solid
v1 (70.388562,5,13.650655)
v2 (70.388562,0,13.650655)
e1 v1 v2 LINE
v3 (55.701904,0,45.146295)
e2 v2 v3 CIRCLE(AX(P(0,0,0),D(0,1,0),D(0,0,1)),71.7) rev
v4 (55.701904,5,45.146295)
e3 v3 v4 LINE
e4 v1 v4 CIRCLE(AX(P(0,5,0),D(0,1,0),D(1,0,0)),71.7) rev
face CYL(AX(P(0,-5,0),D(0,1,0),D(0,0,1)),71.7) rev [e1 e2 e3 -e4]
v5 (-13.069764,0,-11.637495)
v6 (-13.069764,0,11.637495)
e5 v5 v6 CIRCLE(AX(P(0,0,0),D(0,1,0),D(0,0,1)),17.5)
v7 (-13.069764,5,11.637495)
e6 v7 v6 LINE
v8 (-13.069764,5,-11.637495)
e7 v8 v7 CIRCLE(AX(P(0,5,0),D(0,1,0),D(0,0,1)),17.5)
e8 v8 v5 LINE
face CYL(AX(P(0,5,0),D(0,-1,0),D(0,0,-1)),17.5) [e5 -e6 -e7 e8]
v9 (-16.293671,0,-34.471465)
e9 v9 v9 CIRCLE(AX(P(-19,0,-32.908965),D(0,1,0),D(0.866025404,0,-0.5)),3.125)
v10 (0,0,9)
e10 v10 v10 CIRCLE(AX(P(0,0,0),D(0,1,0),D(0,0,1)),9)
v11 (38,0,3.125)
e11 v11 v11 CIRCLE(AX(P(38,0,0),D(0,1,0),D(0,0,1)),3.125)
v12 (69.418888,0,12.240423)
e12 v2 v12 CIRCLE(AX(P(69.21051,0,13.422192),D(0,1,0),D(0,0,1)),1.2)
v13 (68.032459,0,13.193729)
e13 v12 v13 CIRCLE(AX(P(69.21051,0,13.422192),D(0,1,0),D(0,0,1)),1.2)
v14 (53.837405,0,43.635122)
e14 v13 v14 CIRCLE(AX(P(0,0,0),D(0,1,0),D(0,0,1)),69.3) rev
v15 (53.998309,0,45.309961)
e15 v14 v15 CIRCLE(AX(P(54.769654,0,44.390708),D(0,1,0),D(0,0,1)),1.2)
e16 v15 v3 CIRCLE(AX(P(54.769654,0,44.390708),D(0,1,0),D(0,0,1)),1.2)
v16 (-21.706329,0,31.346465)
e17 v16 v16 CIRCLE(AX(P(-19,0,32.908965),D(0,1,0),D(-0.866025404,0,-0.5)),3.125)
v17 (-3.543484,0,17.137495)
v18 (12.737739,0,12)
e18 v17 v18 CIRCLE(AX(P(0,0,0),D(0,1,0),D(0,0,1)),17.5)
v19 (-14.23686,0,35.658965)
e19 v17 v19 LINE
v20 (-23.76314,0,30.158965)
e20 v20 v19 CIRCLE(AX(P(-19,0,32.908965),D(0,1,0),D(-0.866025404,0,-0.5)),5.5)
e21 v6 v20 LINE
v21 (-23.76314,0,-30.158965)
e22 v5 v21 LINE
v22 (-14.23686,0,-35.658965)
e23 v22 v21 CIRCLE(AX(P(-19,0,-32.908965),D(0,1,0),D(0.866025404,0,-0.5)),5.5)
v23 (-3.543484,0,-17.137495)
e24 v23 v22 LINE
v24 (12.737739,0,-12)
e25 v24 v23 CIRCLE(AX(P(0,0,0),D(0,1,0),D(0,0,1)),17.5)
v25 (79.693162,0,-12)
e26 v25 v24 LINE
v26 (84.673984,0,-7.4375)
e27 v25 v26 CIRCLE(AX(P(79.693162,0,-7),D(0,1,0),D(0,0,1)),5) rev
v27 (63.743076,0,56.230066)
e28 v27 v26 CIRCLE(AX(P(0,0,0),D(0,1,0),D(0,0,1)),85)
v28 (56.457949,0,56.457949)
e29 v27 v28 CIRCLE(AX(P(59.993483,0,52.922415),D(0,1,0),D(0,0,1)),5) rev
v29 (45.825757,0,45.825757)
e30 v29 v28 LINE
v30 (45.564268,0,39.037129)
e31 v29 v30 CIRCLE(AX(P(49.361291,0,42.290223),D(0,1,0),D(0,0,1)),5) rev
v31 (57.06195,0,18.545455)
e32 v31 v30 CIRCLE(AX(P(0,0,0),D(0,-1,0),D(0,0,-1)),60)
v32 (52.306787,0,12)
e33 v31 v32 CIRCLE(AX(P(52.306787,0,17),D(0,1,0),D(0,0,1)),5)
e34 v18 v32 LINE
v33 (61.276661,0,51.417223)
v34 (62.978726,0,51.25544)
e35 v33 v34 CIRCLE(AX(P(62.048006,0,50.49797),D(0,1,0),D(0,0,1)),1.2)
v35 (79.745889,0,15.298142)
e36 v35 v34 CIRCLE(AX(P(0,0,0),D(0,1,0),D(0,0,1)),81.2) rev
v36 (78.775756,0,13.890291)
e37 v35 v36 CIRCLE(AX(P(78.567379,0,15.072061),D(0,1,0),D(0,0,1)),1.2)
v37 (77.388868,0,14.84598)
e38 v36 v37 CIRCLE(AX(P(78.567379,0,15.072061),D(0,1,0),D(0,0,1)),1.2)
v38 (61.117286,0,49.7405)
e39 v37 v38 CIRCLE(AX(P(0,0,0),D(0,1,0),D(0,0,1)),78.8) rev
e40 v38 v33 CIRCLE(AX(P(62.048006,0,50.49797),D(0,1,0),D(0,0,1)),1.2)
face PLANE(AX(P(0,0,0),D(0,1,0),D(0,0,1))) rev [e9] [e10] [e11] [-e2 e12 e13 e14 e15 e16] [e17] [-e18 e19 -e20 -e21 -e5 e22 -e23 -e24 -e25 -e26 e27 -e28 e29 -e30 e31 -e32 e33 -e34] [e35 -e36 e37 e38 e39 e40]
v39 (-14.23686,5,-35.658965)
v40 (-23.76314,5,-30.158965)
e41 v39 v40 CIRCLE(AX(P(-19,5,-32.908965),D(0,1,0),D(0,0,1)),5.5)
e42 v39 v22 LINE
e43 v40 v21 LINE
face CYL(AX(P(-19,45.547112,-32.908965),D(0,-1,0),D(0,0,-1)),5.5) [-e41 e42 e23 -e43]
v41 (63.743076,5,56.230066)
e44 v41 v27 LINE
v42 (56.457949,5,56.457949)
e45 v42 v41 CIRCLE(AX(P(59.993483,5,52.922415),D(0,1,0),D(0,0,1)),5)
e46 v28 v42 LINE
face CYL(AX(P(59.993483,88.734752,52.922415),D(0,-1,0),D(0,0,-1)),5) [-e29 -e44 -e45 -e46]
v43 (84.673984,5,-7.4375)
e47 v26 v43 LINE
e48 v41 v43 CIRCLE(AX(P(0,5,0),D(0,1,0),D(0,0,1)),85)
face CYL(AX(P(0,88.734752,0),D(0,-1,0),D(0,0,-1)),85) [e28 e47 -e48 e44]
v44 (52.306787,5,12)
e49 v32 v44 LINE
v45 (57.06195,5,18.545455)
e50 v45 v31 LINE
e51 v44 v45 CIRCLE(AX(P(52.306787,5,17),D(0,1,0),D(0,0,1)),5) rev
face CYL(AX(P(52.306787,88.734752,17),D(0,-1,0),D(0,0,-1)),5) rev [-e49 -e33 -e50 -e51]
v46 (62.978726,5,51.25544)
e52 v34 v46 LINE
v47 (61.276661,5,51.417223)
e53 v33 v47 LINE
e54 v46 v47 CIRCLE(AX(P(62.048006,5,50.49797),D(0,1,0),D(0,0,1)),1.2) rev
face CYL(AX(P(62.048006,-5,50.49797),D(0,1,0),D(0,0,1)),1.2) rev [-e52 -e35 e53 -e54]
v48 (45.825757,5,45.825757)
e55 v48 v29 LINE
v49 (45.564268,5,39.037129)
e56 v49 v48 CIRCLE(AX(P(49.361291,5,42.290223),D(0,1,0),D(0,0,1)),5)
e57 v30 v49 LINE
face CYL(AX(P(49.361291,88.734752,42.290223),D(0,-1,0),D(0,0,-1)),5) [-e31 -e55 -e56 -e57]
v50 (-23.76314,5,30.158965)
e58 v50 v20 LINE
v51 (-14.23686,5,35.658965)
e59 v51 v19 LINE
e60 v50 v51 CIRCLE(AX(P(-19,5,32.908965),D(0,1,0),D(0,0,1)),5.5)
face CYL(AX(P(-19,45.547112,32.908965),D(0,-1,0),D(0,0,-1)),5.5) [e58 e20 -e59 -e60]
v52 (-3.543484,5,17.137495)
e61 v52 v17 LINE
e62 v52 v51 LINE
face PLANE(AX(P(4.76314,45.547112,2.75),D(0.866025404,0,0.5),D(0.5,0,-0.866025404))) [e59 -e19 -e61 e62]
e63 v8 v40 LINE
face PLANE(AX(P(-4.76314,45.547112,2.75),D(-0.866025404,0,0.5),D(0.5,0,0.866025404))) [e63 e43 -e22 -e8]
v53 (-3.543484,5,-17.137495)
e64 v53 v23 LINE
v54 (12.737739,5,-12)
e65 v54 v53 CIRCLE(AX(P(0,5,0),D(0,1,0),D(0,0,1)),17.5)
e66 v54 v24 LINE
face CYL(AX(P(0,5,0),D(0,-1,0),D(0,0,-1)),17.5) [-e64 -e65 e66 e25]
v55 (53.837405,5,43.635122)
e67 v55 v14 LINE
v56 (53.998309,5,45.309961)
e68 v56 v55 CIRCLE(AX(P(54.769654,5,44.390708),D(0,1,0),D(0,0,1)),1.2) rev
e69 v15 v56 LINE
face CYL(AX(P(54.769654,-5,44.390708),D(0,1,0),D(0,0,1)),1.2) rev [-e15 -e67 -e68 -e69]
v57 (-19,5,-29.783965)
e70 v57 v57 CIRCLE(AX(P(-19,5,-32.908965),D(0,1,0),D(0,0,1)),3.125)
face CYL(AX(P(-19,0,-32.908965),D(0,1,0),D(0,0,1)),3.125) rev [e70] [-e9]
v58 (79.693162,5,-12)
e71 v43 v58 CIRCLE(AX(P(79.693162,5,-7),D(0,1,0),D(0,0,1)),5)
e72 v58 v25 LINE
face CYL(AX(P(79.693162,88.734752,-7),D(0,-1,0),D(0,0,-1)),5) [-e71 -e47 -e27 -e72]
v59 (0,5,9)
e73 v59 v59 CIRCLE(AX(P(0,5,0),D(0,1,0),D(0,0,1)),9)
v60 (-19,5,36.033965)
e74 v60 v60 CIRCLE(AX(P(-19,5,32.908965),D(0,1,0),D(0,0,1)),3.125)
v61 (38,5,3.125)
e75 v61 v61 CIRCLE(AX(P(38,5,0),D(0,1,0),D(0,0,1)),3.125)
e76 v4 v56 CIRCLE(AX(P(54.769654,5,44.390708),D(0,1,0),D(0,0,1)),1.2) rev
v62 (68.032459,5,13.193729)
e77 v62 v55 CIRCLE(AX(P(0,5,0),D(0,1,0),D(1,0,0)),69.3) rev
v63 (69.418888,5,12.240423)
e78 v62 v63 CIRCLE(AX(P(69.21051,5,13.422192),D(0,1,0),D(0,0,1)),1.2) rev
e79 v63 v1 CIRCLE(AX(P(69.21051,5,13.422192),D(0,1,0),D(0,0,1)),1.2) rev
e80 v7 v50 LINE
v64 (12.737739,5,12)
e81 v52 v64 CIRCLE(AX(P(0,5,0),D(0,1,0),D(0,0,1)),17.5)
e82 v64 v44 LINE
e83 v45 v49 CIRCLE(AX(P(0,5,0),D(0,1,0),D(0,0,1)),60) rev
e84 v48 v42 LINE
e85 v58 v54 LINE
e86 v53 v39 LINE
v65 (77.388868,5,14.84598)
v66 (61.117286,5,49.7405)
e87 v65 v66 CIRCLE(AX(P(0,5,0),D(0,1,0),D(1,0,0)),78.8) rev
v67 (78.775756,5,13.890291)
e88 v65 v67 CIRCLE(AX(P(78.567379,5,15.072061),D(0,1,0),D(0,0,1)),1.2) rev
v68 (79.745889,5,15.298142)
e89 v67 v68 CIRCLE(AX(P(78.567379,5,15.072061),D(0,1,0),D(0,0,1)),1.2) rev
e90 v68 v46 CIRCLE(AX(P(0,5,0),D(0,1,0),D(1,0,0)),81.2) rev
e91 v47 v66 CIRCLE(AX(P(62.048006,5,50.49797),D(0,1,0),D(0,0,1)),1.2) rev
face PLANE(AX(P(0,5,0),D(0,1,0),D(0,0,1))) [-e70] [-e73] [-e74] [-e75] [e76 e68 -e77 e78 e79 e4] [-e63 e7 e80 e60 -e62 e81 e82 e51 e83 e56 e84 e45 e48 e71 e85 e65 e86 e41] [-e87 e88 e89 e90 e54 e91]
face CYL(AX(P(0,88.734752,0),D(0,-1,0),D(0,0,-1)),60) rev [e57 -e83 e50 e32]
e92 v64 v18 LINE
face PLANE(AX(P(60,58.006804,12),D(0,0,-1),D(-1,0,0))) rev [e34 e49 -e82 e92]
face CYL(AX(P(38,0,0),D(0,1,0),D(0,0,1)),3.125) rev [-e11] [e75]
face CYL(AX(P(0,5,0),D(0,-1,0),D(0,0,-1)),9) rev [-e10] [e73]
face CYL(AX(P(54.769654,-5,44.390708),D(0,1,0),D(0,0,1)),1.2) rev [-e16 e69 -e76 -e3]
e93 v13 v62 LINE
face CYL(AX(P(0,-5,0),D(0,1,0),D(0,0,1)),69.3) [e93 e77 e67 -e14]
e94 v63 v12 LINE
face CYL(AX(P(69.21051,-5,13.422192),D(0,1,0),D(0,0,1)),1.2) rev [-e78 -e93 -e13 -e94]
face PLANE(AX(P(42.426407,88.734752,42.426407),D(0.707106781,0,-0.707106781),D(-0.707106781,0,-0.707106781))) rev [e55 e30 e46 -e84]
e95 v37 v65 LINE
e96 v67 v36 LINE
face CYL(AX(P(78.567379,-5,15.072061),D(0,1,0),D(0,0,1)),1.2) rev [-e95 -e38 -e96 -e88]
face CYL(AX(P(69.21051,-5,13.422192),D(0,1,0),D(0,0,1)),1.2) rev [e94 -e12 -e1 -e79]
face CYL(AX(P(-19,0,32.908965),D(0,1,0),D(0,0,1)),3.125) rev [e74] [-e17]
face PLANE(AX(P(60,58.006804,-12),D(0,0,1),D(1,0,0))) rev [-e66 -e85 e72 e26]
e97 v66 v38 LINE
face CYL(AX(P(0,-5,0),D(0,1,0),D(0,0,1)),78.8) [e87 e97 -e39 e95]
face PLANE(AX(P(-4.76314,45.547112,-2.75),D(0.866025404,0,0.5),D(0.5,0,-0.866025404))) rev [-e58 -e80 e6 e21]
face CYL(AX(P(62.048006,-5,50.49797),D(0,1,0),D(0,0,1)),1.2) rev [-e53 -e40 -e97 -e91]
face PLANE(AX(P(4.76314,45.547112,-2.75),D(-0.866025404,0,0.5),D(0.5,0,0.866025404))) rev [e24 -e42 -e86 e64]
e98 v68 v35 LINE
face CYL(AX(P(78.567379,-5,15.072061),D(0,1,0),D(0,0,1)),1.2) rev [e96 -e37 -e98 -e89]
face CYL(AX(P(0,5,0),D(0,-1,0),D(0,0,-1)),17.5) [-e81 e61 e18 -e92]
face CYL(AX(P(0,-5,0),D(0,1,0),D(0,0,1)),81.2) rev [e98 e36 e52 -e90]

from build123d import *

# Parameters (mm, degrees)
SKETCH1_R               = 17.5
SKETCH1_R_2             = 9
BOSS_EXTRUDE1_DEPTH     = 5
BOSS_EXTRUDE3_DEPTH     = 5
SKETCH6_W               = 47.262260797
SKETCH6_H               = 24
BOSS_EXTRUDE4_DEPTH     = 5
SKETCH4_R               = 3.125
CUT_EXTRUDE1_DEPTH      = 63.69968102
CIRPATTERN1_COUNT       = 3
BOSS_EXTRUDE5_DEPTH     = 5
CUT_EXTRUDE_THIN1_DEPTH = 10
FILLET1_R               = 1.2
FILLET2_R               = 5


with BuildPart() as part:
    # Sketch1 → Boss-Extrude1 (new body)
    with BuildSketch(Plane(origin=(0, 0, 0), x_dir=(1, 0, 0), z_dir=(0, 1, 0))):
        with Locations(Location((0, 0, 0), (0, 0, 270))):
            Circle(SKETCH1_R)
        with Locations(Location((0, 0, 0), (0, 0, 270))):
            Circle(SKETCH1_R_2, mode=Mode.SUBTRACT)
    extrude(amount=BOSS_EXTRUDE1_DEPTH)

    # Sketch3 → Boss-Extrude3 (add)
    with BuildSketch(Plane(origin=(0, 0, 0), x_dir=(1, 0, 0), z_dir=(0, 1, 0))):
        with BuildLine():
            Line((38, 5.5), (10.009906254, 5.5))
            Line((10.009906254, 5.5), (10.009906254, -5.5))
            Line((10.009906254, -5.5), (38, -5.5))
            ThreePointArc((38, -5.5), (32.5, 0), (38, 5.5))
        make_face()
        with BuildLine():
            ThreePointArc((43.5, 0), (41.889087297, 3.889087297), (38, 5.5))
            Line((38, 5.5), (38, -5.5))
            ThreePointArc((38, -5.5), (41.889087297, -3.889087297), (43.5, 0))
        make_face()
        with BuildLine():
            Line((38, -5.5), (38, 5.5))
            ThreePointArc((38, 5.5), (32.5, 0), (38, -5.5))
        make_face()
    boss_extrude3 = extrude(amount=BOSS_EXTRUDE3_DEPTH)

    # Sketch6 → Boss-Extrude4 (add)
    with BuildSketch(Plane(origin=(0, 0, 0), x_dir=(1, 0, 0), z_dir=(0, 1, 0))):
        with Locations((36.368869602, 0)):
            Rectangle(SKETCH6_W, SKETCH6_H)
    extrude(amount=BOSS_EXTRUDE4_DEPTH)

    # Sketch4 → Cut-Extrude1 (cut, symmetric)
    with BuildSketch(Plane(origin=(0, 5, 0), x_dir=(1, 0, 0), z_dir=(0, 1, 0))):
        with Locations(Location((38, 0, 0), (0, 0, 270))):
            Circle(SKETCH4_R)
    cut_extrude1 = extrude(amount=CUT_EXTRUDE1_DEPTH, both=True, mode=Mode.SUBTRACT)

    # CirPattern1: Boss-Extrude3, Cut-Extrude1 ×3 about axis
    cirpattern1_axis = Axis((0, 0, 0), (0, 1, 0))
    add([boss_extrude3.rotate(cirpattern1_axis, i * 360 / CIRPATTERN1_COUNT) for i in range(1, CIRPATTERN1_COUNT)])
    add([cut_extrude1.rotate(cirpattern1_axis, i * 360 / CIRPATTERN1_COUNT) for i in range(1, CIRPATTERN1_COUNT)], mode=Mode.SUBTRACT)

    # Sketch7 → Boss-Extrude5 (add)
    with BuildSketch(Plane(origin=(0, 0, 0), x_dir=(1, 0, 0), z_dir=(0, 1, 0))):
        with BuildLine():
            Line((42.426406871, -42.426406871), (60.104076401, -60.104076401))
            ThreePointArc((60.104076401, -60.104076401), (78.529760263, -32.528091751), (85, 0))
            ThreePointArc((85, 0), (84.786902365, 6.015079992), (84.148677946, 12))
            Line((84.148677946, 12), (58.787753827, 12))
            ThreePointArc((58.787753827, 12), (59.69616918, 6.03053772), (60, 0))
            ThreePointArc((60, 0), (55.432771951, -22.961005942), (42.426406871, -42.426406871))
        make_face()
    extrude(amount=BOSS_EXTRUDE5_DEPTH)

    # Sketch8 → Cut-Extrude-Thin1 (cut)
    with BuildSketch(Plane(origin=(0, 5, 0), x_dir=(1, 0, 0), z_dir=(0, 1, 0))):
        with BuildLine():
            ThreePointArc((77.602850937, -13.6834764), (71.417053618, -33.302319025), (60.364302118, -50.651663643))
            Line((60.364302118, -50.651663643), (62.202808781, -52.194353907))
            ThreePointArc((62.202808781, -52.194353907), (73.592192307, -34.316602853), (79.966389545, -14.100232027))
            Line((79.966389545, -14.100232027), (77.602850937, -13.6834764))
        make_face()
        with BuildLine():
            ThreePointArc((68.247177284, -12.033818712), (62.807129642, -29.287445539), (53.086879908, -44.545181351))
            Line((53.086879908, -44.545181351), (54.925386572, -46.087871615))
            ThreePointArc((54.925386572, -46.087871615), (64.982268331, -30.301729367), (70.610715891, -12.450574339))
            Line((70.610715891, -12.450574339), (68.247177284, -12.033818712))
        make_face()
    extrude(amount=-CUT_EXTRUDE_THIN1_DEPTH, mode=Mode.SUBTRACT)

    # Fillet1
    fillet1_edges = [part.edges().sort_by_distance(p)[0] for p in [
        (70.610715891, 2.5, 12.450574339),
        (79.966389545, 2.5, 14.100232027),
        (77.602850937, 2.5, 13.6834764),
        (68.247177284, 2.5, 12.033818712),
        (62.202808781, 2.5, 52.194353907),
        (60.364302118, 2.5, 50.651663643),
        (54.925386572, 2.5, 46.087871615),
        (53.086879908, 2.5, 44.545181351),
    ]]
    fillet(fillet1_edges, radius=FILLET1_R - 0.0001)  # a hair under: the kernel refuses the full size

    # Fillet2
    fillet2_edges = [part.edges().sort_by_distance(p)[0] for p in [
        (84.148677946, 2.5, -12),
        (58.787753827, 2.5, 12),
        (42.426406871, 2.5, 42.426406871),
        (60.104076401, 2.5, 60.104076401),
    ]]
    fillet(fillet2_edges, radius=FILLET2_R)


solid = part.part
